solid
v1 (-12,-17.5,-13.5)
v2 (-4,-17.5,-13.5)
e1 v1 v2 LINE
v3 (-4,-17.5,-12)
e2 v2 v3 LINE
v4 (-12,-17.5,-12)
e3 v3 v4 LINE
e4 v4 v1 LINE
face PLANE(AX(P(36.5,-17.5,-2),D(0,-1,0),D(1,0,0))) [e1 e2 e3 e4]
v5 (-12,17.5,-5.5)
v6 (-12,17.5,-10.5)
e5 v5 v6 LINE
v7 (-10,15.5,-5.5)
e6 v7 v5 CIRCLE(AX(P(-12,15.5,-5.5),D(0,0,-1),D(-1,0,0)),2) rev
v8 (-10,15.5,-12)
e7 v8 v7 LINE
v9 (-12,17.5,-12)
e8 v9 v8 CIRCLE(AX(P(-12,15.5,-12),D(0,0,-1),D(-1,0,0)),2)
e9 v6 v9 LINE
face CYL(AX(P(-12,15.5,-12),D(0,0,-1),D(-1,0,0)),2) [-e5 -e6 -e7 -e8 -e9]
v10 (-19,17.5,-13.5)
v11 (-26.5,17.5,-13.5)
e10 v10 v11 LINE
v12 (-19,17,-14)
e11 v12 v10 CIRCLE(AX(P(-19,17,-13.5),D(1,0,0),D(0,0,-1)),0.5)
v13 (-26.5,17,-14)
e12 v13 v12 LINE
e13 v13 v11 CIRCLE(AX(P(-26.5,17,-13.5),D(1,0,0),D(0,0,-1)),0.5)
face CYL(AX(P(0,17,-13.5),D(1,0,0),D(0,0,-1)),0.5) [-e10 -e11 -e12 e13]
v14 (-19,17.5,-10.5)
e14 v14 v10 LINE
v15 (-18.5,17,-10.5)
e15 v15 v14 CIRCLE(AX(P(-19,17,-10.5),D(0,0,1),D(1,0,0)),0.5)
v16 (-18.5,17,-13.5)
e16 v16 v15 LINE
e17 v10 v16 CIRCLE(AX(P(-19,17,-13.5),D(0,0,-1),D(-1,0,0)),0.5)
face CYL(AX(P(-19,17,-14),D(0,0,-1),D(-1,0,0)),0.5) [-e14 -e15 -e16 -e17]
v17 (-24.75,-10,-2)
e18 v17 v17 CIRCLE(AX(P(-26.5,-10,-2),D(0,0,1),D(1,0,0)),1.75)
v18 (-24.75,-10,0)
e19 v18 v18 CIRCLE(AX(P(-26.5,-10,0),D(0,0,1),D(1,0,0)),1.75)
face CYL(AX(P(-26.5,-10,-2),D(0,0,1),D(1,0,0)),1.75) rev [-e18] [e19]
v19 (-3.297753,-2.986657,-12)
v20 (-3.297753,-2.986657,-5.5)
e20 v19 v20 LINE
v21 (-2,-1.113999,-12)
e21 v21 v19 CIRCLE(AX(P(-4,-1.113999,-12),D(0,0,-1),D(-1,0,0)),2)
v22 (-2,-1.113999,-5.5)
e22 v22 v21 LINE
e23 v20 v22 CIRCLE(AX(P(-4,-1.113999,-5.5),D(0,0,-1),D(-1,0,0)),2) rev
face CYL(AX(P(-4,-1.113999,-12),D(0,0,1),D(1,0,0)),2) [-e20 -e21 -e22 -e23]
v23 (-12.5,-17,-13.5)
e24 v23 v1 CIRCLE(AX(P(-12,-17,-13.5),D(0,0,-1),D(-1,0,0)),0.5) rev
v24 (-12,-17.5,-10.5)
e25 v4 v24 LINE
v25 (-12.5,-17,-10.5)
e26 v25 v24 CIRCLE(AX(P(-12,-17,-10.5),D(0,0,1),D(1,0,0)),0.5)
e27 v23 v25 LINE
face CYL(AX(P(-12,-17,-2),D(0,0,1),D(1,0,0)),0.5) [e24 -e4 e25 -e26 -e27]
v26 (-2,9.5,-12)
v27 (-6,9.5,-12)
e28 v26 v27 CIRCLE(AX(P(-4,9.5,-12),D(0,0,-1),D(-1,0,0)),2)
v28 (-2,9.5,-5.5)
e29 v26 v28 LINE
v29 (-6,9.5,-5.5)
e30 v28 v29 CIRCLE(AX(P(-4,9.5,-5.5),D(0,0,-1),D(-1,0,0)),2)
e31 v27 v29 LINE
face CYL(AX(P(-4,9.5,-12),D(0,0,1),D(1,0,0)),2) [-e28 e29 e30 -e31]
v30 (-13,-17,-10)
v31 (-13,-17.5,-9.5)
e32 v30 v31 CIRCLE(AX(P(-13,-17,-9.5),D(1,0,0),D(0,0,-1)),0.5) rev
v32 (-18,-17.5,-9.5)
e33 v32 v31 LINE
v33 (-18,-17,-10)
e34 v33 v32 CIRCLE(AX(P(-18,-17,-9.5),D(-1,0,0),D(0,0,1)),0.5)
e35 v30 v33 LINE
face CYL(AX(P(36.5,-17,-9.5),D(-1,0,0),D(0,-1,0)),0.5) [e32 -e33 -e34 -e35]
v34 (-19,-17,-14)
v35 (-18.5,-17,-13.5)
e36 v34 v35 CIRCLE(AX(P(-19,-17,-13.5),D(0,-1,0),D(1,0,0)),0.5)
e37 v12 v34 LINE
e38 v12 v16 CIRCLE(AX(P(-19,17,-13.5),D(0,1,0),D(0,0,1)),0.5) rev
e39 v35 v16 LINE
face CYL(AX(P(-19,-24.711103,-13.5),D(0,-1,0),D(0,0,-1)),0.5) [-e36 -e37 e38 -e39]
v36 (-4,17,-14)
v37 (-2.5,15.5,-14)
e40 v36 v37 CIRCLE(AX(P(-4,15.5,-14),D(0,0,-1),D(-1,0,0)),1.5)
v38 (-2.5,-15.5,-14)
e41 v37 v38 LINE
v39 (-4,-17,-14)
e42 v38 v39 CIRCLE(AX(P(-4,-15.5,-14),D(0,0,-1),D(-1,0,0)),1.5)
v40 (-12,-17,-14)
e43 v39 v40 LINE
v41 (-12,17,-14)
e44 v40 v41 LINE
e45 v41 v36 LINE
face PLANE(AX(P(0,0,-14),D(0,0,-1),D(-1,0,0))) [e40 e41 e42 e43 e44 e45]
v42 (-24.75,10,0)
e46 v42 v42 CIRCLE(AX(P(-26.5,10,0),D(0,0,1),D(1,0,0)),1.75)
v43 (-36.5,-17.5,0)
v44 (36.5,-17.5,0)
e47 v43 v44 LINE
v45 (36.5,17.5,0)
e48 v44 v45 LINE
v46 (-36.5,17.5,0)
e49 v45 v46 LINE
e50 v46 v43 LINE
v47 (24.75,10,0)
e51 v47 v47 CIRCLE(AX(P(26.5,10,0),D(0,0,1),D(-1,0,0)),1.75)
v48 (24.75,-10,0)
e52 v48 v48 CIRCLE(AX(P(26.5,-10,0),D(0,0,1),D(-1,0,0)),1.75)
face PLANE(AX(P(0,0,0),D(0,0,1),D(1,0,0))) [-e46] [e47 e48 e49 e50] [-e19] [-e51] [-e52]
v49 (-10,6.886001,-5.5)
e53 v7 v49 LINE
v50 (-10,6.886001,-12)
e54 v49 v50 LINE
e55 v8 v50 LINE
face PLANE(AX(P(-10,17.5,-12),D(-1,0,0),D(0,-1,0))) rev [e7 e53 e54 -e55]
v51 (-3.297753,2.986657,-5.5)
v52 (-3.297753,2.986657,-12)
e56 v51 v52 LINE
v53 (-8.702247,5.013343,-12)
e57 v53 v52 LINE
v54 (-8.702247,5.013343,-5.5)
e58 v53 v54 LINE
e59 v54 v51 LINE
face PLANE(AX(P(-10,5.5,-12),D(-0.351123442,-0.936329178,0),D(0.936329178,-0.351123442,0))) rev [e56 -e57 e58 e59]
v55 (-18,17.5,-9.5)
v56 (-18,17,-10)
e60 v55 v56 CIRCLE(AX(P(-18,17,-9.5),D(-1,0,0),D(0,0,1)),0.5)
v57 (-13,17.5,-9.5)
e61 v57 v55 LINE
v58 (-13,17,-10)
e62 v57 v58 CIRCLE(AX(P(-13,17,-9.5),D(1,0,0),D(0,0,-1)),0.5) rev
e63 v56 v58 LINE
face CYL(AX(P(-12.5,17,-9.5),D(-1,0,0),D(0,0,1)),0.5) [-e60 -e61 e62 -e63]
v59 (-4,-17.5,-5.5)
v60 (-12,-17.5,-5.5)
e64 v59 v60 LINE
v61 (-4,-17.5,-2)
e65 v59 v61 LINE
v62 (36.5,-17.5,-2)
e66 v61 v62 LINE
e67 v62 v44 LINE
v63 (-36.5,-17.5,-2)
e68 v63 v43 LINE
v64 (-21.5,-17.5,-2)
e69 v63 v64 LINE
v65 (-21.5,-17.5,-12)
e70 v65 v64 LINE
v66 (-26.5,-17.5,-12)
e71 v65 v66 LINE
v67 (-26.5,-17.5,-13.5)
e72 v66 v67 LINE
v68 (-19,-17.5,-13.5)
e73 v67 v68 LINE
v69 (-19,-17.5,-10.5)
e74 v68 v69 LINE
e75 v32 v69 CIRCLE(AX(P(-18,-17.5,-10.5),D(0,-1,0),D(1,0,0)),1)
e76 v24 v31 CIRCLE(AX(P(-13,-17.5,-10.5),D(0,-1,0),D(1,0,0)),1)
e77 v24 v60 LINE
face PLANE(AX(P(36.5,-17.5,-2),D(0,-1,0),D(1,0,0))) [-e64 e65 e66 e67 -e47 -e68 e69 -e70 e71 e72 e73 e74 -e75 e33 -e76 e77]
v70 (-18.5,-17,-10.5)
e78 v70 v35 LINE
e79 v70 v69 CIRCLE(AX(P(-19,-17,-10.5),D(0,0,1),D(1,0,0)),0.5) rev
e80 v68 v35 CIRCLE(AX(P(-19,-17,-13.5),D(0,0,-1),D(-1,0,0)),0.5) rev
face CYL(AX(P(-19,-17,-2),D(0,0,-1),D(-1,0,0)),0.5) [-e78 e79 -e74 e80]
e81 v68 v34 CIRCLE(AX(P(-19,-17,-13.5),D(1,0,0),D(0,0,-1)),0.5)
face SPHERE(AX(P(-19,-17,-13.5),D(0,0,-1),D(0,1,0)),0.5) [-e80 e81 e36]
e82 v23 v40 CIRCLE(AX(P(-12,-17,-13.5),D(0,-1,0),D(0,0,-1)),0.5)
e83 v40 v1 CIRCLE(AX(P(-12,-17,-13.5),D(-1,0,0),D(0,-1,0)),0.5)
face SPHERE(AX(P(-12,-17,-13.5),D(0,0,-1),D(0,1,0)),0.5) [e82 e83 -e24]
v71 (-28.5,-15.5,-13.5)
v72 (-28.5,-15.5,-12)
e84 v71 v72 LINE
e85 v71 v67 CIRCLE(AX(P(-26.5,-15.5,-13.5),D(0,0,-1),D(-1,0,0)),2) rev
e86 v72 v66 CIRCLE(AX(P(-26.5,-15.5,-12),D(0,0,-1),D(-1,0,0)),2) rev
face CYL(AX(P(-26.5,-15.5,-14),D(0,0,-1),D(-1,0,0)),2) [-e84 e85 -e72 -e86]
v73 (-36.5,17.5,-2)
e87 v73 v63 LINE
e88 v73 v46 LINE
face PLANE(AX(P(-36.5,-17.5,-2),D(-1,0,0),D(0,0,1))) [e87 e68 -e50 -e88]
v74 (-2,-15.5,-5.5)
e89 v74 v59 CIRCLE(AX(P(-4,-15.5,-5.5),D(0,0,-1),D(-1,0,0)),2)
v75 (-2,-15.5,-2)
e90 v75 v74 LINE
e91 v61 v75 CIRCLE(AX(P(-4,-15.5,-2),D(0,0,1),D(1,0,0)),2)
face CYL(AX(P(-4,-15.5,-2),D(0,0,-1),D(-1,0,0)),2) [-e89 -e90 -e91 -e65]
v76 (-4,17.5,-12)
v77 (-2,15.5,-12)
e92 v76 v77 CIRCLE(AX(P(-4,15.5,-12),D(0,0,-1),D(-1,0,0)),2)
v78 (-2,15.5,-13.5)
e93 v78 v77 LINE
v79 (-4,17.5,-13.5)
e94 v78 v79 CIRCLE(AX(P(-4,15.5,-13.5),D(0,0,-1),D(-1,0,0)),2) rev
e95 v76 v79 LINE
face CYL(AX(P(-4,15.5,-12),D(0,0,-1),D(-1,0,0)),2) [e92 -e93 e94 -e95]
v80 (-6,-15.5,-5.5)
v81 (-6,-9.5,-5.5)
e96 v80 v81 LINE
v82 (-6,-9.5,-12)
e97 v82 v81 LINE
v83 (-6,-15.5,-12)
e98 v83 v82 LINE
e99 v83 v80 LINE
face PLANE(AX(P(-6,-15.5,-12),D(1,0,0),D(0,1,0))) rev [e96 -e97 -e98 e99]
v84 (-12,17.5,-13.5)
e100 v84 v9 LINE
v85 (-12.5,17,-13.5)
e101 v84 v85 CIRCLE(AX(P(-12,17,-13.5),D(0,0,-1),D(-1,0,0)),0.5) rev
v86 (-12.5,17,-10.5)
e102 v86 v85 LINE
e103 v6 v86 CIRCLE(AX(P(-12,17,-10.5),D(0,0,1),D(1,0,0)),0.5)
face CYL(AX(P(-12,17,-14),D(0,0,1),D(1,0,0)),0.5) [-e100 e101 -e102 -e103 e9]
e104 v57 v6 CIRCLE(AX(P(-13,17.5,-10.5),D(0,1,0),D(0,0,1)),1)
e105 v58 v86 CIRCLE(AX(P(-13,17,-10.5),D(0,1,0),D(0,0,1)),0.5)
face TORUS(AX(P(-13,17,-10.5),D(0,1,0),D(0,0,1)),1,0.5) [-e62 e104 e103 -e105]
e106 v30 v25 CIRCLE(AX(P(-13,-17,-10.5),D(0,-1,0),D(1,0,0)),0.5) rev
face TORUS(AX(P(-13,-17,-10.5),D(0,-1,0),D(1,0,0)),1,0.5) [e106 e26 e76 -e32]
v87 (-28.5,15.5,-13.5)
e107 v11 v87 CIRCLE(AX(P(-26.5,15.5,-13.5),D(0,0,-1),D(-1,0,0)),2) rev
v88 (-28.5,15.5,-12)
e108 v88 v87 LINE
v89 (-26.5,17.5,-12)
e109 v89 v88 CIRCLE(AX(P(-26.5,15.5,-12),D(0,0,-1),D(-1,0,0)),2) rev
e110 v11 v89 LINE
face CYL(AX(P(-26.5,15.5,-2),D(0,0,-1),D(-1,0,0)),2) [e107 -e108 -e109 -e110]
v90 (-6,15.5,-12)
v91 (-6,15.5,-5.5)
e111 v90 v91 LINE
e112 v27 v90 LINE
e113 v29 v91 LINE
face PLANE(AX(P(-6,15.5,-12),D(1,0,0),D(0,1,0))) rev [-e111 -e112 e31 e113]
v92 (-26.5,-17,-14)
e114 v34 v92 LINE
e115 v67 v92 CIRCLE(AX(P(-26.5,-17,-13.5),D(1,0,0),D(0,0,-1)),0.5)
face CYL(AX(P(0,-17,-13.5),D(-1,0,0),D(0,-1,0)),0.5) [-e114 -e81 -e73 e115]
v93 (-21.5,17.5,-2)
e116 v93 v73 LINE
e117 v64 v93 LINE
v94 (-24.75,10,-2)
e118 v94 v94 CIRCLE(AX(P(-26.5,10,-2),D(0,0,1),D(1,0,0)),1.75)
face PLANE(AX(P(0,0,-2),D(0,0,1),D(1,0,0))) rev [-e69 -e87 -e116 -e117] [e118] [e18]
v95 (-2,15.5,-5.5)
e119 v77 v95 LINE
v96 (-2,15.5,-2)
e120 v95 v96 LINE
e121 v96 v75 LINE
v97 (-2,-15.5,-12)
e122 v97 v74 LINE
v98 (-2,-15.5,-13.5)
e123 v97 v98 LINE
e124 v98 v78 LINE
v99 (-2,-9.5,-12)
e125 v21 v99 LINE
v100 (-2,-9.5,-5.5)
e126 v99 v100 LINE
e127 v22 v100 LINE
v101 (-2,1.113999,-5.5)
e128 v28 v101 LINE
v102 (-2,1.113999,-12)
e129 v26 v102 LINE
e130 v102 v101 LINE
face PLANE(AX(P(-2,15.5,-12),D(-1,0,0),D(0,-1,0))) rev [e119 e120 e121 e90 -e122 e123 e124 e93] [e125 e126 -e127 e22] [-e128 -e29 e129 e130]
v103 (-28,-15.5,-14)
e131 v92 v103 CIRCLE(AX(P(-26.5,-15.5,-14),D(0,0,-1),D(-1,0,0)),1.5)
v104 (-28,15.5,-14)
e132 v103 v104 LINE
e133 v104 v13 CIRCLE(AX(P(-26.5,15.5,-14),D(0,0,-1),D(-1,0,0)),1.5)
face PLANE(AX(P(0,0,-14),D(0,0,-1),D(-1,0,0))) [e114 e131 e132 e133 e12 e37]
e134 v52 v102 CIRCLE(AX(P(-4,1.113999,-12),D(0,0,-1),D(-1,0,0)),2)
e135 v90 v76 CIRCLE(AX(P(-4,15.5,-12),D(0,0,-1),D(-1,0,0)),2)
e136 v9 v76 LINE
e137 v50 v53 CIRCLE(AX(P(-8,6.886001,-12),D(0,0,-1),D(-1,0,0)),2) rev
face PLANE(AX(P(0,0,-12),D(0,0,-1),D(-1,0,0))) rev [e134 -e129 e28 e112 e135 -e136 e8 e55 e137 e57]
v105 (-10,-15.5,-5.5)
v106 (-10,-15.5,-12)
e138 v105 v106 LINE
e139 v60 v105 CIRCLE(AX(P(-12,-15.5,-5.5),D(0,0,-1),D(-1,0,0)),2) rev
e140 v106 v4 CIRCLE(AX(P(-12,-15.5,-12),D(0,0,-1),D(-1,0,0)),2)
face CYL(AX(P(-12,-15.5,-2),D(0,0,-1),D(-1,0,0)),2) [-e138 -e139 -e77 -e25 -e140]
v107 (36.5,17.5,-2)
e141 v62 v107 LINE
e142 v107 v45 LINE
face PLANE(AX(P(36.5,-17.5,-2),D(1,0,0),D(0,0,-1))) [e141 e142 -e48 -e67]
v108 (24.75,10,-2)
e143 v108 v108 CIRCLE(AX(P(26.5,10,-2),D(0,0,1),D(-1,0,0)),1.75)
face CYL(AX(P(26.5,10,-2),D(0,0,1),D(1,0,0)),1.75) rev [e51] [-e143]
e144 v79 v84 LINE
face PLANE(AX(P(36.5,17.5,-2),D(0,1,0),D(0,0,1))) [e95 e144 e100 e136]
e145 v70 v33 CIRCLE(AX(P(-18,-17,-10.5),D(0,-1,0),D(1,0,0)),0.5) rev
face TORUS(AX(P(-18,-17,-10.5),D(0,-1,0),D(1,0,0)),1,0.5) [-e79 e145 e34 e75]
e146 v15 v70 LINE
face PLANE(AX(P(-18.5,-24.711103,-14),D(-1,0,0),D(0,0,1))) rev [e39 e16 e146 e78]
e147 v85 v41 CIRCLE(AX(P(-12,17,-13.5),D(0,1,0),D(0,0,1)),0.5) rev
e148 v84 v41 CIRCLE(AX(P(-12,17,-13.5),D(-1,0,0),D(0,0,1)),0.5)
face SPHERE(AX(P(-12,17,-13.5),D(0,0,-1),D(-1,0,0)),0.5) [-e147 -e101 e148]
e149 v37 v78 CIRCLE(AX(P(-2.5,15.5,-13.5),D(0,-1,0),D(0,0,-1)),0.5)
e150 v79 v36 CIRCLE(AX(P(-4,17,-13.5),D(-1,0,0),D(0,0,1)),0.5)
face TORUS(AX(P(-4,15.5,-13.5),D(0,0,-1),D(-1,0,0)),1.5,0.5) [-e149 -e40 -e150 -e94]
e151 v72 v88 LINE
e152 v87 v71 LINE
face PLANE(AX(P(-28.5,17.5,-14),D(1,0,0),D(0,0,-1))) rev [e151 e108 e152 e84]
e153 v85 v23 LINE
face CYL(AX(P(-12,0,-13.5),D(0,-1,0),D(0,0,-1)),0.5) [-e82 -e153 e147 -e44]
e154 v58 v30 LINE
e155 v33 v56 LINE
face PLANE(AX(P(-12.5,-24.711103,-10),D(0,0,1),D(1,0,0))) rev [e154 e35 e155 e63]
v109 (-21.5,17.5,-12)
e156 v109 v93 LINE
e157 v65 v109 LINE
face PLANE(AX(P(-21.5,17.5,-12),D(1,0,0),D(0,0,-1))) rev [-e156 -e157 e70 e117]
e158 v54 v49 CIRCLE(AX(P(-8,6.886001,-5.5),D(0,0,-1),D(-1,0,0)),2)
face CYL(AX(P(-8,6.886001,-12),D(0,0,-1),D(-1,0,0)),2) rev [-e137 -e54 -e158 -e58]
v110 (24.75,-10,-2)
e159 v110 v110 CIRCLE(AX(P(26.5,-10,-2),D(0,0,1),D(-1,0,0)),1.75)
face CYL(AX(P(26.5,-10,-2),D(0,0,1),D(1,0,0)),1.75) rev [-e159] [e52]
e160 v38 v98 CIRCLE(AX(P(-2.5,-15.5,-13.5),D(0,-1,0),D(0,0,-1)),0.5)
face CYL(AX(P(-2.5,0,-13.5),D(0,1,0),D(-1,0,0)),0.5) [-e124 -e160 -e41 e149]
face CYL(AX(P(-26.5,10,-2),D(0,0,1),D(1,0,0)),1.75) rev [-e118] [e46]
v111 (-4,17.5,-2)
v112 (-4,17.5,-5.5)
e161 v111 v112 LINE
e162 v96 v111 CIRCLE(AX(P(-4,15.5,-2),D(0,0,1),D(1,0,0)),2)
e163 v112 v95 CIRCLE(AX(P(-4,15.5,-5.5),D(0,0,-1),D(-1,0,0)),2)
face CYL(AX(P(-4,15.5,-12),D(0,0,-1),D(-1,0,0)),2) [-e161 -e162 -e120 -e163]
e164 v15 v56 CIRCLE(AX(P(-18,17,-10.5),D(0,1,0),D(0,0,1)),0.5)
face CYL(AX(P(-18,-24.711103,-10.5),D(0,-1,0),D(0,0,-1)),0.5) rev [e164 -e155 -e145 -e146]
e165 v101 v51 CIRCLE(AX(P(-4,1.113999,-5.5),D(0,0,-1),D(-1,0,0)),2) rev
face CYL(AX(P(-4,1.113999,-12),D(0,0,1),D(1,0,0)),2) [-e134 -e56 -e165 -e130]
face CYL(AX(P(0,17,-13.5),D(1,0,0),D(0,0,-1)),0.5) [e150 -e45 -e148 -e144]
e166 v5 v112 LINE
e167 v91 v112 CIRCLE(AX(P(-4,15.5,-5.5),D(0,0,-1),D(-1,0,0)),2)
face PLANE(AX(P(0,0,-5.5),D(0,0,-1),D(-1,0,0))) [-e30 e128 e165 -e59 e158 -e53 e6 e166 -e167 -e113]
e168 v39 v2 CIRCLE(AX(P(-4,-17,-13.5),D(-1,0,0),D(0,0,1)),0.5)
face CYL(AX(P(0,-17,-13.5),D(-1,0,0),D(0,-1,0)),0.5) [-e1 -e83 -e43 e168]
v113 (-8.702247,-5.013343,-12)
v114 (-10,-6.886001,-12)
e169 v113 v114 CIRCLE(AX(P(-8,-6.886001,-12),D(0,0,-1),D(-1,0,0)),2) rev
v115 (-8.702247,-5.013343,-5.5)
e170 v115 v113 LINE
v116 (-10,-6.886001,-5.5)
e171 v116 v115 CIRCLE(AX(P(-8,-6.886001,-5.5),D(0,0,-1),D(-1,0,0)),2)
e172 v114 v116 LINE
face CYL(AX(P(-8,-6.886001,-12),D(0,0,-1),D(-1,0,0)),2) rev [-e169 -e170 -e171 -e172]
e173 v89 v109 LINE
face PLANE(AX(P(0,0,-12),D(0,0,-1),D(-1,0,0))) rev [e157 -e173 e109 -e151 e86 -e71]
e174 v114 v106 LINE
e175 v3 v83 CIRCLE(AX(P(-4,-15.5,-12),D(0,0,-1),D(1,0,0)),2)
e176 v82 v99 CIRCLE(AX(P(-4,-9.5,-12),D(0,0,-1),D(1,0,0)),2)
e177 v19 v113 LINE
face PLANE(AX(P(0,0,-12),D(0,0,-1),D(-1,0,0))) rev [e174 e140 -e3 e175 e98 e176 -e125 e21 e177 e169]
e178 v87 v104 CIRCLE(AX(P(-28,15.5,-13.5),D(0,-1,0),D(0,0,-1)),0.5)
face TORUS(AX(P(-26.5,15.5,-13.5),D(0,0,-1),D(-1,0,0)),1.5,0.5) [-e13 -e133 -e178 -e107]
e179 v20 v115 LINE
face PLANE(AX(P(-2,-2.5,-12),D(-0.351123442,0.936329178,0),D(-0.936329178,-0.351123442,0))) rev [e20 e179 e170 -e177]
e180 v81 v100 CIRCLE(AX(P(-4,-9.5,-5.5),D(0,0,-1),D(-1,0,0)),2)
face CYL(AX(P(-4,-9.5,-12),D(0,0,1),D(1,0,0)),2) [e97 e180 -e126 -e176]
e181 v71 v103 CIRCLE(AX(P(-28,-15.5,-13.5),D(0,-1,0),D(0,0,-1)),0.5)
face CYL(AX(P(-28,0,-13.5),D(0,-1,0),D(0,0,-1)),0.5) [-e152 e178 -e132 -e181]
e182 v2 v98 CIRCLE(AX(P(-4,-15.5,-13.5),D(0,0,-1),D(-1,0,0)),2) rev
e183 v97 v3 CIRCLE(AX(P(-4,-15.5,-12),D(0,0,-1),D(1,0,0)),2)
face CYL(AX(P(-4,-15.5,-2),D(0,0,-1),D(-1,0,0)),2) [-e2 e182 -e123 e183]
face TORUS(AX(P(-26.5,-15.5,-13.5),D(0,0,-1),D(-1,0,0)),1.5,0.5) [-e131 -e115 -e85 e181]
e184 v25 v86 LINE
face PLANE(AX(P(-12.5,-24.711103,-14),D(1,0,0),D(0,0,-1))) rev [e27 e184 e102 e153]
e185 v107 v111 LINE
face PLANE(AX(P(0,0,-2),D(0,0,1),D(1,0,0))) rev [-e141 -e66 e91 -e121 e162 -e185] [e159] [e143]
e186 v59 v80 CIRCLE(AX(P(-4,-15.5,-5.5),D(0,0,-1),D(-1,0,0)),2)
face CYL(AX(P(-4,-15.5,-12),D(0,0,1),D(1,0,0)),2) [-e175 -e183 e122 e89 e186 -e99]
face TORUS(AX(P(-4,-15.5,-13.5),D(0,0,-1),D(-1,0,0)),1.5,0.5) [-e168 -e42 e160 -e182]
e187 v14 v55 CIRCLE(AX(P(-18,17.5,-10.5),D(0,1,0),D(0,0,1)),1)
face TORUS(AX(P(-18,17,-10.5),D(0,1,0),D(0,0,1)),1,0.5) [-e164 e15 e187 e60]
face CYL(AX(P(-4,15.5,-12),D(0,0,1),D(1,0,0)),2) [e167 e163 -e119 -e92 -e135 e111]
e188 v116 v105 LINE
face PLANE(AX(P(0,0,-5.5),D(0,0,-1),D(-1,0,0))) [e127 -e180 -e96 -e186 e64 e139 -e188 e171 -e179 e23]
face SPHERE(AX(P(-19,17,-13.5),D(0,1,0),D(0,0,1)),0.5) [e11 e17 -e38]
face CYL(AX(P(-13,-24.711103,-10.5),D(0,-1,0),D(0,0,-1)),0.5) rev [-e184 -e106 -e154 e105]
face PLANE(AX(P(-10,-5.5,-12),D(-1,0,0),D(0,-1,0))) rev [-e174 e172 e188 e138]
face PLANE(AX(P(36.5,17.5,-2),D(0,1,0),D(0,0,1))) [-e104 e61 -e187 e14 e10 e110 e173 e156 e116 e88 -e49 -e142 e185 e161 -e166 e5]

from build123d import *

# Parameters (mm, degrees)
ESQUISSE1_W             = 73
ESQUISSE1_H             = 35
ESQUISSE1_R             = 1.75
BOSS_EXTRU_1_DEPTH      = 2
BOSS_EXTRU_2_DEPTH      = 10
ESQUISSE3_W             = 26.5
ESQUISSE3_H             = 35
BOSS_EXTRU_3_DEPTH      = 2
ESQUISSE4_W             = 19.5
ESQUISSE4_H             = 35
BOSS_EXTRU_4_DEPTH      = 3.5
CONG_1_R                = 2
ESQUISSE5_W             = 6
ESQUISSE5_H             = 4
ENL_V_MAT_EXTRU_1_DEPTH = 35
CONG_2_R                = 0.5


with BuildPart() as part:
    # Esquisse1 → Boss.-Extru.1 (new body)
    with BuildSketch(Plane.XY):
        Rectangle(ESQUISSE1_W, ESQUISSE1_H)
        with Locations((-26.5, 10)):
            Circle(ESQUISSE1_R, mode=Mode.SUBTRACT)
        with Locations((-26.5, -10)):
            Circle(ESQUISSE1_R, mode=Mode.SUBTRACT)
        with Locations(Location((26.5, -10, 0), (0, 0, 180))):
            Circle(ESQUISSE1_R, mode=Mode.SUBTRACT)
        with Locations(Location((26.5, 10, 0), (0, 0, 180))):
            Circle(ESQUISSE1_R, mode=Mode.SUBTRACT)
    extrude(amount=-BOSS_EXTRU_1_DEPTH)

    # Esquisse2 → Boss.-Extru.2 (add)
    with BuildSketch(Plane(origin=(0, 0, -2), x_dir=(-1, 0, 0), z_dir=(0, 0, -1))):
        with BuildLine():
            Line((6, 15.5), (6, 9.5))
            ThreePointArc((6, 9.5), (4, 7.5), (2, 9.5))
            Line((2, 9.5), (2, 15.5))
            ThreePointArc((2, 15.5), (4, 17.5), (6, 15.5))
        make_face()
        with BuildLine():
            Line((6, -15.5), (6, -9.5))
            ThreePointArc((6, -9.5), (4, -7.5), (2, -9.5))
            Line((2, -9.5), (2, -15.5))
            ThreePointArc((2, -15.5), (4, -17.5), (6, -15.5))
        make_face()
        Polygon((10, 17.5), (10, 5.5), (2, 2.5), (2, -2.5), (10, -5.5), (10, -17.5), (21.5, -17.5), (21.5, 17.5), align=None)
    extrude(amount=BOSS_EXTRU_2_DEPTH)

    # Esquisse3 → Boss.-Extru.3 (add)
    with BuildSketch(Plane(origin=(0, 0, -12), x_dir=(-1, 0, 0), z_dir=(0, 0, -1))):
        with Locations((15.25, 0)):
            Rectangle(ESQUISSE3_W, ESQUISSE3_H)
    extrude(amount=BOSS_EXTRU_3_DEPTH)

    # Esquisse4 → Boss.-Extru.4 (add)
    with BuildSketch(Plane(origin=(0, 0, -2), x_dir=(-1, 0, 0), z_dir=(0, 0, -1))):
        with Locations((11.75, 0)):
            Rectangle(ESQUISSE4_W, ESQUISSE4_H)
    extrude(amount=BOSS_EXTRU_4_DEPTH)

    # Congé1
    cong_1_edges = [part.edges().sort_by_distance(p)[0] for p in [
        (-2, 17.5, -3.75),
        (-2, -17.5, -3.75),
        (-10, 17.5, -8.75),
        (-10, 5.5, -8.75),
        (-2, 2.5, -8.75),
        (-2, -2.5, -8.75),
        (-10, -5.5, -8.75),
        (-10, -17.5, -8.75),
        (-2, 17.5, -13),
        (-2, -17.5, -13),
        (-28.5, -17.5, -13),
        (-28.5, 17.5, -13),
    ]]
    fillet(cong_1_edges, radius=CONG_1_R - 0.0001)  # a hair under: the kernel refuses the full size

    # Esquisse5 → Enlèv. mat.-Extru.1 (cut)
    with BuildSketch(Plane(origin=(0, 17.5, 0), x_dir=(1, 0, 0), z_dir=(0, 1, 0))):
        with Locations((-15.5, 12)):
            Rectangle(ESQUISSE5_W, ESQUISSE5_H)
    extrude(amount=-ENL_V_MAT_EXTRU_1_DEPTH, mode=Mode.SUBTRACT)

    # Congé2
    cong_2_edges = [part.edges().sort_by_distance(p)[0] for p in [
        (-28.5, 0, -14),
        (-8.24995, -17.5, -14),
        (-2, 0, -14),
        (-22.50005, 17.5, -14),
        (-2.585757148, 16.914242852, -14),
        (-2.585757148, -16.914242852, -14),
        (-27.914242852, 16.914242852, -14),
        (-27.914242852, -16.914242852, -14),
        (-22.50005, -17.5, -14),
        (-8.24995, 17.5, -14),
        (-12.5, 17.5, -12),
        (-18.5, 17.5, -12),
        (-15.5, 17.5, -10),
        (-18.5, 0, -14),
        (-18.5, -17.5, -12),
        (-18.5, 0, -10),
        (-15.5, -17.5, -10),
        (-12.5, 0, -10),
        (-12.5, -17.5, -12),
        (-12.5, 0, -14),
    ]]
    fillet(cong_2_edges, radius=CONG_2_R)


solid = part.part
